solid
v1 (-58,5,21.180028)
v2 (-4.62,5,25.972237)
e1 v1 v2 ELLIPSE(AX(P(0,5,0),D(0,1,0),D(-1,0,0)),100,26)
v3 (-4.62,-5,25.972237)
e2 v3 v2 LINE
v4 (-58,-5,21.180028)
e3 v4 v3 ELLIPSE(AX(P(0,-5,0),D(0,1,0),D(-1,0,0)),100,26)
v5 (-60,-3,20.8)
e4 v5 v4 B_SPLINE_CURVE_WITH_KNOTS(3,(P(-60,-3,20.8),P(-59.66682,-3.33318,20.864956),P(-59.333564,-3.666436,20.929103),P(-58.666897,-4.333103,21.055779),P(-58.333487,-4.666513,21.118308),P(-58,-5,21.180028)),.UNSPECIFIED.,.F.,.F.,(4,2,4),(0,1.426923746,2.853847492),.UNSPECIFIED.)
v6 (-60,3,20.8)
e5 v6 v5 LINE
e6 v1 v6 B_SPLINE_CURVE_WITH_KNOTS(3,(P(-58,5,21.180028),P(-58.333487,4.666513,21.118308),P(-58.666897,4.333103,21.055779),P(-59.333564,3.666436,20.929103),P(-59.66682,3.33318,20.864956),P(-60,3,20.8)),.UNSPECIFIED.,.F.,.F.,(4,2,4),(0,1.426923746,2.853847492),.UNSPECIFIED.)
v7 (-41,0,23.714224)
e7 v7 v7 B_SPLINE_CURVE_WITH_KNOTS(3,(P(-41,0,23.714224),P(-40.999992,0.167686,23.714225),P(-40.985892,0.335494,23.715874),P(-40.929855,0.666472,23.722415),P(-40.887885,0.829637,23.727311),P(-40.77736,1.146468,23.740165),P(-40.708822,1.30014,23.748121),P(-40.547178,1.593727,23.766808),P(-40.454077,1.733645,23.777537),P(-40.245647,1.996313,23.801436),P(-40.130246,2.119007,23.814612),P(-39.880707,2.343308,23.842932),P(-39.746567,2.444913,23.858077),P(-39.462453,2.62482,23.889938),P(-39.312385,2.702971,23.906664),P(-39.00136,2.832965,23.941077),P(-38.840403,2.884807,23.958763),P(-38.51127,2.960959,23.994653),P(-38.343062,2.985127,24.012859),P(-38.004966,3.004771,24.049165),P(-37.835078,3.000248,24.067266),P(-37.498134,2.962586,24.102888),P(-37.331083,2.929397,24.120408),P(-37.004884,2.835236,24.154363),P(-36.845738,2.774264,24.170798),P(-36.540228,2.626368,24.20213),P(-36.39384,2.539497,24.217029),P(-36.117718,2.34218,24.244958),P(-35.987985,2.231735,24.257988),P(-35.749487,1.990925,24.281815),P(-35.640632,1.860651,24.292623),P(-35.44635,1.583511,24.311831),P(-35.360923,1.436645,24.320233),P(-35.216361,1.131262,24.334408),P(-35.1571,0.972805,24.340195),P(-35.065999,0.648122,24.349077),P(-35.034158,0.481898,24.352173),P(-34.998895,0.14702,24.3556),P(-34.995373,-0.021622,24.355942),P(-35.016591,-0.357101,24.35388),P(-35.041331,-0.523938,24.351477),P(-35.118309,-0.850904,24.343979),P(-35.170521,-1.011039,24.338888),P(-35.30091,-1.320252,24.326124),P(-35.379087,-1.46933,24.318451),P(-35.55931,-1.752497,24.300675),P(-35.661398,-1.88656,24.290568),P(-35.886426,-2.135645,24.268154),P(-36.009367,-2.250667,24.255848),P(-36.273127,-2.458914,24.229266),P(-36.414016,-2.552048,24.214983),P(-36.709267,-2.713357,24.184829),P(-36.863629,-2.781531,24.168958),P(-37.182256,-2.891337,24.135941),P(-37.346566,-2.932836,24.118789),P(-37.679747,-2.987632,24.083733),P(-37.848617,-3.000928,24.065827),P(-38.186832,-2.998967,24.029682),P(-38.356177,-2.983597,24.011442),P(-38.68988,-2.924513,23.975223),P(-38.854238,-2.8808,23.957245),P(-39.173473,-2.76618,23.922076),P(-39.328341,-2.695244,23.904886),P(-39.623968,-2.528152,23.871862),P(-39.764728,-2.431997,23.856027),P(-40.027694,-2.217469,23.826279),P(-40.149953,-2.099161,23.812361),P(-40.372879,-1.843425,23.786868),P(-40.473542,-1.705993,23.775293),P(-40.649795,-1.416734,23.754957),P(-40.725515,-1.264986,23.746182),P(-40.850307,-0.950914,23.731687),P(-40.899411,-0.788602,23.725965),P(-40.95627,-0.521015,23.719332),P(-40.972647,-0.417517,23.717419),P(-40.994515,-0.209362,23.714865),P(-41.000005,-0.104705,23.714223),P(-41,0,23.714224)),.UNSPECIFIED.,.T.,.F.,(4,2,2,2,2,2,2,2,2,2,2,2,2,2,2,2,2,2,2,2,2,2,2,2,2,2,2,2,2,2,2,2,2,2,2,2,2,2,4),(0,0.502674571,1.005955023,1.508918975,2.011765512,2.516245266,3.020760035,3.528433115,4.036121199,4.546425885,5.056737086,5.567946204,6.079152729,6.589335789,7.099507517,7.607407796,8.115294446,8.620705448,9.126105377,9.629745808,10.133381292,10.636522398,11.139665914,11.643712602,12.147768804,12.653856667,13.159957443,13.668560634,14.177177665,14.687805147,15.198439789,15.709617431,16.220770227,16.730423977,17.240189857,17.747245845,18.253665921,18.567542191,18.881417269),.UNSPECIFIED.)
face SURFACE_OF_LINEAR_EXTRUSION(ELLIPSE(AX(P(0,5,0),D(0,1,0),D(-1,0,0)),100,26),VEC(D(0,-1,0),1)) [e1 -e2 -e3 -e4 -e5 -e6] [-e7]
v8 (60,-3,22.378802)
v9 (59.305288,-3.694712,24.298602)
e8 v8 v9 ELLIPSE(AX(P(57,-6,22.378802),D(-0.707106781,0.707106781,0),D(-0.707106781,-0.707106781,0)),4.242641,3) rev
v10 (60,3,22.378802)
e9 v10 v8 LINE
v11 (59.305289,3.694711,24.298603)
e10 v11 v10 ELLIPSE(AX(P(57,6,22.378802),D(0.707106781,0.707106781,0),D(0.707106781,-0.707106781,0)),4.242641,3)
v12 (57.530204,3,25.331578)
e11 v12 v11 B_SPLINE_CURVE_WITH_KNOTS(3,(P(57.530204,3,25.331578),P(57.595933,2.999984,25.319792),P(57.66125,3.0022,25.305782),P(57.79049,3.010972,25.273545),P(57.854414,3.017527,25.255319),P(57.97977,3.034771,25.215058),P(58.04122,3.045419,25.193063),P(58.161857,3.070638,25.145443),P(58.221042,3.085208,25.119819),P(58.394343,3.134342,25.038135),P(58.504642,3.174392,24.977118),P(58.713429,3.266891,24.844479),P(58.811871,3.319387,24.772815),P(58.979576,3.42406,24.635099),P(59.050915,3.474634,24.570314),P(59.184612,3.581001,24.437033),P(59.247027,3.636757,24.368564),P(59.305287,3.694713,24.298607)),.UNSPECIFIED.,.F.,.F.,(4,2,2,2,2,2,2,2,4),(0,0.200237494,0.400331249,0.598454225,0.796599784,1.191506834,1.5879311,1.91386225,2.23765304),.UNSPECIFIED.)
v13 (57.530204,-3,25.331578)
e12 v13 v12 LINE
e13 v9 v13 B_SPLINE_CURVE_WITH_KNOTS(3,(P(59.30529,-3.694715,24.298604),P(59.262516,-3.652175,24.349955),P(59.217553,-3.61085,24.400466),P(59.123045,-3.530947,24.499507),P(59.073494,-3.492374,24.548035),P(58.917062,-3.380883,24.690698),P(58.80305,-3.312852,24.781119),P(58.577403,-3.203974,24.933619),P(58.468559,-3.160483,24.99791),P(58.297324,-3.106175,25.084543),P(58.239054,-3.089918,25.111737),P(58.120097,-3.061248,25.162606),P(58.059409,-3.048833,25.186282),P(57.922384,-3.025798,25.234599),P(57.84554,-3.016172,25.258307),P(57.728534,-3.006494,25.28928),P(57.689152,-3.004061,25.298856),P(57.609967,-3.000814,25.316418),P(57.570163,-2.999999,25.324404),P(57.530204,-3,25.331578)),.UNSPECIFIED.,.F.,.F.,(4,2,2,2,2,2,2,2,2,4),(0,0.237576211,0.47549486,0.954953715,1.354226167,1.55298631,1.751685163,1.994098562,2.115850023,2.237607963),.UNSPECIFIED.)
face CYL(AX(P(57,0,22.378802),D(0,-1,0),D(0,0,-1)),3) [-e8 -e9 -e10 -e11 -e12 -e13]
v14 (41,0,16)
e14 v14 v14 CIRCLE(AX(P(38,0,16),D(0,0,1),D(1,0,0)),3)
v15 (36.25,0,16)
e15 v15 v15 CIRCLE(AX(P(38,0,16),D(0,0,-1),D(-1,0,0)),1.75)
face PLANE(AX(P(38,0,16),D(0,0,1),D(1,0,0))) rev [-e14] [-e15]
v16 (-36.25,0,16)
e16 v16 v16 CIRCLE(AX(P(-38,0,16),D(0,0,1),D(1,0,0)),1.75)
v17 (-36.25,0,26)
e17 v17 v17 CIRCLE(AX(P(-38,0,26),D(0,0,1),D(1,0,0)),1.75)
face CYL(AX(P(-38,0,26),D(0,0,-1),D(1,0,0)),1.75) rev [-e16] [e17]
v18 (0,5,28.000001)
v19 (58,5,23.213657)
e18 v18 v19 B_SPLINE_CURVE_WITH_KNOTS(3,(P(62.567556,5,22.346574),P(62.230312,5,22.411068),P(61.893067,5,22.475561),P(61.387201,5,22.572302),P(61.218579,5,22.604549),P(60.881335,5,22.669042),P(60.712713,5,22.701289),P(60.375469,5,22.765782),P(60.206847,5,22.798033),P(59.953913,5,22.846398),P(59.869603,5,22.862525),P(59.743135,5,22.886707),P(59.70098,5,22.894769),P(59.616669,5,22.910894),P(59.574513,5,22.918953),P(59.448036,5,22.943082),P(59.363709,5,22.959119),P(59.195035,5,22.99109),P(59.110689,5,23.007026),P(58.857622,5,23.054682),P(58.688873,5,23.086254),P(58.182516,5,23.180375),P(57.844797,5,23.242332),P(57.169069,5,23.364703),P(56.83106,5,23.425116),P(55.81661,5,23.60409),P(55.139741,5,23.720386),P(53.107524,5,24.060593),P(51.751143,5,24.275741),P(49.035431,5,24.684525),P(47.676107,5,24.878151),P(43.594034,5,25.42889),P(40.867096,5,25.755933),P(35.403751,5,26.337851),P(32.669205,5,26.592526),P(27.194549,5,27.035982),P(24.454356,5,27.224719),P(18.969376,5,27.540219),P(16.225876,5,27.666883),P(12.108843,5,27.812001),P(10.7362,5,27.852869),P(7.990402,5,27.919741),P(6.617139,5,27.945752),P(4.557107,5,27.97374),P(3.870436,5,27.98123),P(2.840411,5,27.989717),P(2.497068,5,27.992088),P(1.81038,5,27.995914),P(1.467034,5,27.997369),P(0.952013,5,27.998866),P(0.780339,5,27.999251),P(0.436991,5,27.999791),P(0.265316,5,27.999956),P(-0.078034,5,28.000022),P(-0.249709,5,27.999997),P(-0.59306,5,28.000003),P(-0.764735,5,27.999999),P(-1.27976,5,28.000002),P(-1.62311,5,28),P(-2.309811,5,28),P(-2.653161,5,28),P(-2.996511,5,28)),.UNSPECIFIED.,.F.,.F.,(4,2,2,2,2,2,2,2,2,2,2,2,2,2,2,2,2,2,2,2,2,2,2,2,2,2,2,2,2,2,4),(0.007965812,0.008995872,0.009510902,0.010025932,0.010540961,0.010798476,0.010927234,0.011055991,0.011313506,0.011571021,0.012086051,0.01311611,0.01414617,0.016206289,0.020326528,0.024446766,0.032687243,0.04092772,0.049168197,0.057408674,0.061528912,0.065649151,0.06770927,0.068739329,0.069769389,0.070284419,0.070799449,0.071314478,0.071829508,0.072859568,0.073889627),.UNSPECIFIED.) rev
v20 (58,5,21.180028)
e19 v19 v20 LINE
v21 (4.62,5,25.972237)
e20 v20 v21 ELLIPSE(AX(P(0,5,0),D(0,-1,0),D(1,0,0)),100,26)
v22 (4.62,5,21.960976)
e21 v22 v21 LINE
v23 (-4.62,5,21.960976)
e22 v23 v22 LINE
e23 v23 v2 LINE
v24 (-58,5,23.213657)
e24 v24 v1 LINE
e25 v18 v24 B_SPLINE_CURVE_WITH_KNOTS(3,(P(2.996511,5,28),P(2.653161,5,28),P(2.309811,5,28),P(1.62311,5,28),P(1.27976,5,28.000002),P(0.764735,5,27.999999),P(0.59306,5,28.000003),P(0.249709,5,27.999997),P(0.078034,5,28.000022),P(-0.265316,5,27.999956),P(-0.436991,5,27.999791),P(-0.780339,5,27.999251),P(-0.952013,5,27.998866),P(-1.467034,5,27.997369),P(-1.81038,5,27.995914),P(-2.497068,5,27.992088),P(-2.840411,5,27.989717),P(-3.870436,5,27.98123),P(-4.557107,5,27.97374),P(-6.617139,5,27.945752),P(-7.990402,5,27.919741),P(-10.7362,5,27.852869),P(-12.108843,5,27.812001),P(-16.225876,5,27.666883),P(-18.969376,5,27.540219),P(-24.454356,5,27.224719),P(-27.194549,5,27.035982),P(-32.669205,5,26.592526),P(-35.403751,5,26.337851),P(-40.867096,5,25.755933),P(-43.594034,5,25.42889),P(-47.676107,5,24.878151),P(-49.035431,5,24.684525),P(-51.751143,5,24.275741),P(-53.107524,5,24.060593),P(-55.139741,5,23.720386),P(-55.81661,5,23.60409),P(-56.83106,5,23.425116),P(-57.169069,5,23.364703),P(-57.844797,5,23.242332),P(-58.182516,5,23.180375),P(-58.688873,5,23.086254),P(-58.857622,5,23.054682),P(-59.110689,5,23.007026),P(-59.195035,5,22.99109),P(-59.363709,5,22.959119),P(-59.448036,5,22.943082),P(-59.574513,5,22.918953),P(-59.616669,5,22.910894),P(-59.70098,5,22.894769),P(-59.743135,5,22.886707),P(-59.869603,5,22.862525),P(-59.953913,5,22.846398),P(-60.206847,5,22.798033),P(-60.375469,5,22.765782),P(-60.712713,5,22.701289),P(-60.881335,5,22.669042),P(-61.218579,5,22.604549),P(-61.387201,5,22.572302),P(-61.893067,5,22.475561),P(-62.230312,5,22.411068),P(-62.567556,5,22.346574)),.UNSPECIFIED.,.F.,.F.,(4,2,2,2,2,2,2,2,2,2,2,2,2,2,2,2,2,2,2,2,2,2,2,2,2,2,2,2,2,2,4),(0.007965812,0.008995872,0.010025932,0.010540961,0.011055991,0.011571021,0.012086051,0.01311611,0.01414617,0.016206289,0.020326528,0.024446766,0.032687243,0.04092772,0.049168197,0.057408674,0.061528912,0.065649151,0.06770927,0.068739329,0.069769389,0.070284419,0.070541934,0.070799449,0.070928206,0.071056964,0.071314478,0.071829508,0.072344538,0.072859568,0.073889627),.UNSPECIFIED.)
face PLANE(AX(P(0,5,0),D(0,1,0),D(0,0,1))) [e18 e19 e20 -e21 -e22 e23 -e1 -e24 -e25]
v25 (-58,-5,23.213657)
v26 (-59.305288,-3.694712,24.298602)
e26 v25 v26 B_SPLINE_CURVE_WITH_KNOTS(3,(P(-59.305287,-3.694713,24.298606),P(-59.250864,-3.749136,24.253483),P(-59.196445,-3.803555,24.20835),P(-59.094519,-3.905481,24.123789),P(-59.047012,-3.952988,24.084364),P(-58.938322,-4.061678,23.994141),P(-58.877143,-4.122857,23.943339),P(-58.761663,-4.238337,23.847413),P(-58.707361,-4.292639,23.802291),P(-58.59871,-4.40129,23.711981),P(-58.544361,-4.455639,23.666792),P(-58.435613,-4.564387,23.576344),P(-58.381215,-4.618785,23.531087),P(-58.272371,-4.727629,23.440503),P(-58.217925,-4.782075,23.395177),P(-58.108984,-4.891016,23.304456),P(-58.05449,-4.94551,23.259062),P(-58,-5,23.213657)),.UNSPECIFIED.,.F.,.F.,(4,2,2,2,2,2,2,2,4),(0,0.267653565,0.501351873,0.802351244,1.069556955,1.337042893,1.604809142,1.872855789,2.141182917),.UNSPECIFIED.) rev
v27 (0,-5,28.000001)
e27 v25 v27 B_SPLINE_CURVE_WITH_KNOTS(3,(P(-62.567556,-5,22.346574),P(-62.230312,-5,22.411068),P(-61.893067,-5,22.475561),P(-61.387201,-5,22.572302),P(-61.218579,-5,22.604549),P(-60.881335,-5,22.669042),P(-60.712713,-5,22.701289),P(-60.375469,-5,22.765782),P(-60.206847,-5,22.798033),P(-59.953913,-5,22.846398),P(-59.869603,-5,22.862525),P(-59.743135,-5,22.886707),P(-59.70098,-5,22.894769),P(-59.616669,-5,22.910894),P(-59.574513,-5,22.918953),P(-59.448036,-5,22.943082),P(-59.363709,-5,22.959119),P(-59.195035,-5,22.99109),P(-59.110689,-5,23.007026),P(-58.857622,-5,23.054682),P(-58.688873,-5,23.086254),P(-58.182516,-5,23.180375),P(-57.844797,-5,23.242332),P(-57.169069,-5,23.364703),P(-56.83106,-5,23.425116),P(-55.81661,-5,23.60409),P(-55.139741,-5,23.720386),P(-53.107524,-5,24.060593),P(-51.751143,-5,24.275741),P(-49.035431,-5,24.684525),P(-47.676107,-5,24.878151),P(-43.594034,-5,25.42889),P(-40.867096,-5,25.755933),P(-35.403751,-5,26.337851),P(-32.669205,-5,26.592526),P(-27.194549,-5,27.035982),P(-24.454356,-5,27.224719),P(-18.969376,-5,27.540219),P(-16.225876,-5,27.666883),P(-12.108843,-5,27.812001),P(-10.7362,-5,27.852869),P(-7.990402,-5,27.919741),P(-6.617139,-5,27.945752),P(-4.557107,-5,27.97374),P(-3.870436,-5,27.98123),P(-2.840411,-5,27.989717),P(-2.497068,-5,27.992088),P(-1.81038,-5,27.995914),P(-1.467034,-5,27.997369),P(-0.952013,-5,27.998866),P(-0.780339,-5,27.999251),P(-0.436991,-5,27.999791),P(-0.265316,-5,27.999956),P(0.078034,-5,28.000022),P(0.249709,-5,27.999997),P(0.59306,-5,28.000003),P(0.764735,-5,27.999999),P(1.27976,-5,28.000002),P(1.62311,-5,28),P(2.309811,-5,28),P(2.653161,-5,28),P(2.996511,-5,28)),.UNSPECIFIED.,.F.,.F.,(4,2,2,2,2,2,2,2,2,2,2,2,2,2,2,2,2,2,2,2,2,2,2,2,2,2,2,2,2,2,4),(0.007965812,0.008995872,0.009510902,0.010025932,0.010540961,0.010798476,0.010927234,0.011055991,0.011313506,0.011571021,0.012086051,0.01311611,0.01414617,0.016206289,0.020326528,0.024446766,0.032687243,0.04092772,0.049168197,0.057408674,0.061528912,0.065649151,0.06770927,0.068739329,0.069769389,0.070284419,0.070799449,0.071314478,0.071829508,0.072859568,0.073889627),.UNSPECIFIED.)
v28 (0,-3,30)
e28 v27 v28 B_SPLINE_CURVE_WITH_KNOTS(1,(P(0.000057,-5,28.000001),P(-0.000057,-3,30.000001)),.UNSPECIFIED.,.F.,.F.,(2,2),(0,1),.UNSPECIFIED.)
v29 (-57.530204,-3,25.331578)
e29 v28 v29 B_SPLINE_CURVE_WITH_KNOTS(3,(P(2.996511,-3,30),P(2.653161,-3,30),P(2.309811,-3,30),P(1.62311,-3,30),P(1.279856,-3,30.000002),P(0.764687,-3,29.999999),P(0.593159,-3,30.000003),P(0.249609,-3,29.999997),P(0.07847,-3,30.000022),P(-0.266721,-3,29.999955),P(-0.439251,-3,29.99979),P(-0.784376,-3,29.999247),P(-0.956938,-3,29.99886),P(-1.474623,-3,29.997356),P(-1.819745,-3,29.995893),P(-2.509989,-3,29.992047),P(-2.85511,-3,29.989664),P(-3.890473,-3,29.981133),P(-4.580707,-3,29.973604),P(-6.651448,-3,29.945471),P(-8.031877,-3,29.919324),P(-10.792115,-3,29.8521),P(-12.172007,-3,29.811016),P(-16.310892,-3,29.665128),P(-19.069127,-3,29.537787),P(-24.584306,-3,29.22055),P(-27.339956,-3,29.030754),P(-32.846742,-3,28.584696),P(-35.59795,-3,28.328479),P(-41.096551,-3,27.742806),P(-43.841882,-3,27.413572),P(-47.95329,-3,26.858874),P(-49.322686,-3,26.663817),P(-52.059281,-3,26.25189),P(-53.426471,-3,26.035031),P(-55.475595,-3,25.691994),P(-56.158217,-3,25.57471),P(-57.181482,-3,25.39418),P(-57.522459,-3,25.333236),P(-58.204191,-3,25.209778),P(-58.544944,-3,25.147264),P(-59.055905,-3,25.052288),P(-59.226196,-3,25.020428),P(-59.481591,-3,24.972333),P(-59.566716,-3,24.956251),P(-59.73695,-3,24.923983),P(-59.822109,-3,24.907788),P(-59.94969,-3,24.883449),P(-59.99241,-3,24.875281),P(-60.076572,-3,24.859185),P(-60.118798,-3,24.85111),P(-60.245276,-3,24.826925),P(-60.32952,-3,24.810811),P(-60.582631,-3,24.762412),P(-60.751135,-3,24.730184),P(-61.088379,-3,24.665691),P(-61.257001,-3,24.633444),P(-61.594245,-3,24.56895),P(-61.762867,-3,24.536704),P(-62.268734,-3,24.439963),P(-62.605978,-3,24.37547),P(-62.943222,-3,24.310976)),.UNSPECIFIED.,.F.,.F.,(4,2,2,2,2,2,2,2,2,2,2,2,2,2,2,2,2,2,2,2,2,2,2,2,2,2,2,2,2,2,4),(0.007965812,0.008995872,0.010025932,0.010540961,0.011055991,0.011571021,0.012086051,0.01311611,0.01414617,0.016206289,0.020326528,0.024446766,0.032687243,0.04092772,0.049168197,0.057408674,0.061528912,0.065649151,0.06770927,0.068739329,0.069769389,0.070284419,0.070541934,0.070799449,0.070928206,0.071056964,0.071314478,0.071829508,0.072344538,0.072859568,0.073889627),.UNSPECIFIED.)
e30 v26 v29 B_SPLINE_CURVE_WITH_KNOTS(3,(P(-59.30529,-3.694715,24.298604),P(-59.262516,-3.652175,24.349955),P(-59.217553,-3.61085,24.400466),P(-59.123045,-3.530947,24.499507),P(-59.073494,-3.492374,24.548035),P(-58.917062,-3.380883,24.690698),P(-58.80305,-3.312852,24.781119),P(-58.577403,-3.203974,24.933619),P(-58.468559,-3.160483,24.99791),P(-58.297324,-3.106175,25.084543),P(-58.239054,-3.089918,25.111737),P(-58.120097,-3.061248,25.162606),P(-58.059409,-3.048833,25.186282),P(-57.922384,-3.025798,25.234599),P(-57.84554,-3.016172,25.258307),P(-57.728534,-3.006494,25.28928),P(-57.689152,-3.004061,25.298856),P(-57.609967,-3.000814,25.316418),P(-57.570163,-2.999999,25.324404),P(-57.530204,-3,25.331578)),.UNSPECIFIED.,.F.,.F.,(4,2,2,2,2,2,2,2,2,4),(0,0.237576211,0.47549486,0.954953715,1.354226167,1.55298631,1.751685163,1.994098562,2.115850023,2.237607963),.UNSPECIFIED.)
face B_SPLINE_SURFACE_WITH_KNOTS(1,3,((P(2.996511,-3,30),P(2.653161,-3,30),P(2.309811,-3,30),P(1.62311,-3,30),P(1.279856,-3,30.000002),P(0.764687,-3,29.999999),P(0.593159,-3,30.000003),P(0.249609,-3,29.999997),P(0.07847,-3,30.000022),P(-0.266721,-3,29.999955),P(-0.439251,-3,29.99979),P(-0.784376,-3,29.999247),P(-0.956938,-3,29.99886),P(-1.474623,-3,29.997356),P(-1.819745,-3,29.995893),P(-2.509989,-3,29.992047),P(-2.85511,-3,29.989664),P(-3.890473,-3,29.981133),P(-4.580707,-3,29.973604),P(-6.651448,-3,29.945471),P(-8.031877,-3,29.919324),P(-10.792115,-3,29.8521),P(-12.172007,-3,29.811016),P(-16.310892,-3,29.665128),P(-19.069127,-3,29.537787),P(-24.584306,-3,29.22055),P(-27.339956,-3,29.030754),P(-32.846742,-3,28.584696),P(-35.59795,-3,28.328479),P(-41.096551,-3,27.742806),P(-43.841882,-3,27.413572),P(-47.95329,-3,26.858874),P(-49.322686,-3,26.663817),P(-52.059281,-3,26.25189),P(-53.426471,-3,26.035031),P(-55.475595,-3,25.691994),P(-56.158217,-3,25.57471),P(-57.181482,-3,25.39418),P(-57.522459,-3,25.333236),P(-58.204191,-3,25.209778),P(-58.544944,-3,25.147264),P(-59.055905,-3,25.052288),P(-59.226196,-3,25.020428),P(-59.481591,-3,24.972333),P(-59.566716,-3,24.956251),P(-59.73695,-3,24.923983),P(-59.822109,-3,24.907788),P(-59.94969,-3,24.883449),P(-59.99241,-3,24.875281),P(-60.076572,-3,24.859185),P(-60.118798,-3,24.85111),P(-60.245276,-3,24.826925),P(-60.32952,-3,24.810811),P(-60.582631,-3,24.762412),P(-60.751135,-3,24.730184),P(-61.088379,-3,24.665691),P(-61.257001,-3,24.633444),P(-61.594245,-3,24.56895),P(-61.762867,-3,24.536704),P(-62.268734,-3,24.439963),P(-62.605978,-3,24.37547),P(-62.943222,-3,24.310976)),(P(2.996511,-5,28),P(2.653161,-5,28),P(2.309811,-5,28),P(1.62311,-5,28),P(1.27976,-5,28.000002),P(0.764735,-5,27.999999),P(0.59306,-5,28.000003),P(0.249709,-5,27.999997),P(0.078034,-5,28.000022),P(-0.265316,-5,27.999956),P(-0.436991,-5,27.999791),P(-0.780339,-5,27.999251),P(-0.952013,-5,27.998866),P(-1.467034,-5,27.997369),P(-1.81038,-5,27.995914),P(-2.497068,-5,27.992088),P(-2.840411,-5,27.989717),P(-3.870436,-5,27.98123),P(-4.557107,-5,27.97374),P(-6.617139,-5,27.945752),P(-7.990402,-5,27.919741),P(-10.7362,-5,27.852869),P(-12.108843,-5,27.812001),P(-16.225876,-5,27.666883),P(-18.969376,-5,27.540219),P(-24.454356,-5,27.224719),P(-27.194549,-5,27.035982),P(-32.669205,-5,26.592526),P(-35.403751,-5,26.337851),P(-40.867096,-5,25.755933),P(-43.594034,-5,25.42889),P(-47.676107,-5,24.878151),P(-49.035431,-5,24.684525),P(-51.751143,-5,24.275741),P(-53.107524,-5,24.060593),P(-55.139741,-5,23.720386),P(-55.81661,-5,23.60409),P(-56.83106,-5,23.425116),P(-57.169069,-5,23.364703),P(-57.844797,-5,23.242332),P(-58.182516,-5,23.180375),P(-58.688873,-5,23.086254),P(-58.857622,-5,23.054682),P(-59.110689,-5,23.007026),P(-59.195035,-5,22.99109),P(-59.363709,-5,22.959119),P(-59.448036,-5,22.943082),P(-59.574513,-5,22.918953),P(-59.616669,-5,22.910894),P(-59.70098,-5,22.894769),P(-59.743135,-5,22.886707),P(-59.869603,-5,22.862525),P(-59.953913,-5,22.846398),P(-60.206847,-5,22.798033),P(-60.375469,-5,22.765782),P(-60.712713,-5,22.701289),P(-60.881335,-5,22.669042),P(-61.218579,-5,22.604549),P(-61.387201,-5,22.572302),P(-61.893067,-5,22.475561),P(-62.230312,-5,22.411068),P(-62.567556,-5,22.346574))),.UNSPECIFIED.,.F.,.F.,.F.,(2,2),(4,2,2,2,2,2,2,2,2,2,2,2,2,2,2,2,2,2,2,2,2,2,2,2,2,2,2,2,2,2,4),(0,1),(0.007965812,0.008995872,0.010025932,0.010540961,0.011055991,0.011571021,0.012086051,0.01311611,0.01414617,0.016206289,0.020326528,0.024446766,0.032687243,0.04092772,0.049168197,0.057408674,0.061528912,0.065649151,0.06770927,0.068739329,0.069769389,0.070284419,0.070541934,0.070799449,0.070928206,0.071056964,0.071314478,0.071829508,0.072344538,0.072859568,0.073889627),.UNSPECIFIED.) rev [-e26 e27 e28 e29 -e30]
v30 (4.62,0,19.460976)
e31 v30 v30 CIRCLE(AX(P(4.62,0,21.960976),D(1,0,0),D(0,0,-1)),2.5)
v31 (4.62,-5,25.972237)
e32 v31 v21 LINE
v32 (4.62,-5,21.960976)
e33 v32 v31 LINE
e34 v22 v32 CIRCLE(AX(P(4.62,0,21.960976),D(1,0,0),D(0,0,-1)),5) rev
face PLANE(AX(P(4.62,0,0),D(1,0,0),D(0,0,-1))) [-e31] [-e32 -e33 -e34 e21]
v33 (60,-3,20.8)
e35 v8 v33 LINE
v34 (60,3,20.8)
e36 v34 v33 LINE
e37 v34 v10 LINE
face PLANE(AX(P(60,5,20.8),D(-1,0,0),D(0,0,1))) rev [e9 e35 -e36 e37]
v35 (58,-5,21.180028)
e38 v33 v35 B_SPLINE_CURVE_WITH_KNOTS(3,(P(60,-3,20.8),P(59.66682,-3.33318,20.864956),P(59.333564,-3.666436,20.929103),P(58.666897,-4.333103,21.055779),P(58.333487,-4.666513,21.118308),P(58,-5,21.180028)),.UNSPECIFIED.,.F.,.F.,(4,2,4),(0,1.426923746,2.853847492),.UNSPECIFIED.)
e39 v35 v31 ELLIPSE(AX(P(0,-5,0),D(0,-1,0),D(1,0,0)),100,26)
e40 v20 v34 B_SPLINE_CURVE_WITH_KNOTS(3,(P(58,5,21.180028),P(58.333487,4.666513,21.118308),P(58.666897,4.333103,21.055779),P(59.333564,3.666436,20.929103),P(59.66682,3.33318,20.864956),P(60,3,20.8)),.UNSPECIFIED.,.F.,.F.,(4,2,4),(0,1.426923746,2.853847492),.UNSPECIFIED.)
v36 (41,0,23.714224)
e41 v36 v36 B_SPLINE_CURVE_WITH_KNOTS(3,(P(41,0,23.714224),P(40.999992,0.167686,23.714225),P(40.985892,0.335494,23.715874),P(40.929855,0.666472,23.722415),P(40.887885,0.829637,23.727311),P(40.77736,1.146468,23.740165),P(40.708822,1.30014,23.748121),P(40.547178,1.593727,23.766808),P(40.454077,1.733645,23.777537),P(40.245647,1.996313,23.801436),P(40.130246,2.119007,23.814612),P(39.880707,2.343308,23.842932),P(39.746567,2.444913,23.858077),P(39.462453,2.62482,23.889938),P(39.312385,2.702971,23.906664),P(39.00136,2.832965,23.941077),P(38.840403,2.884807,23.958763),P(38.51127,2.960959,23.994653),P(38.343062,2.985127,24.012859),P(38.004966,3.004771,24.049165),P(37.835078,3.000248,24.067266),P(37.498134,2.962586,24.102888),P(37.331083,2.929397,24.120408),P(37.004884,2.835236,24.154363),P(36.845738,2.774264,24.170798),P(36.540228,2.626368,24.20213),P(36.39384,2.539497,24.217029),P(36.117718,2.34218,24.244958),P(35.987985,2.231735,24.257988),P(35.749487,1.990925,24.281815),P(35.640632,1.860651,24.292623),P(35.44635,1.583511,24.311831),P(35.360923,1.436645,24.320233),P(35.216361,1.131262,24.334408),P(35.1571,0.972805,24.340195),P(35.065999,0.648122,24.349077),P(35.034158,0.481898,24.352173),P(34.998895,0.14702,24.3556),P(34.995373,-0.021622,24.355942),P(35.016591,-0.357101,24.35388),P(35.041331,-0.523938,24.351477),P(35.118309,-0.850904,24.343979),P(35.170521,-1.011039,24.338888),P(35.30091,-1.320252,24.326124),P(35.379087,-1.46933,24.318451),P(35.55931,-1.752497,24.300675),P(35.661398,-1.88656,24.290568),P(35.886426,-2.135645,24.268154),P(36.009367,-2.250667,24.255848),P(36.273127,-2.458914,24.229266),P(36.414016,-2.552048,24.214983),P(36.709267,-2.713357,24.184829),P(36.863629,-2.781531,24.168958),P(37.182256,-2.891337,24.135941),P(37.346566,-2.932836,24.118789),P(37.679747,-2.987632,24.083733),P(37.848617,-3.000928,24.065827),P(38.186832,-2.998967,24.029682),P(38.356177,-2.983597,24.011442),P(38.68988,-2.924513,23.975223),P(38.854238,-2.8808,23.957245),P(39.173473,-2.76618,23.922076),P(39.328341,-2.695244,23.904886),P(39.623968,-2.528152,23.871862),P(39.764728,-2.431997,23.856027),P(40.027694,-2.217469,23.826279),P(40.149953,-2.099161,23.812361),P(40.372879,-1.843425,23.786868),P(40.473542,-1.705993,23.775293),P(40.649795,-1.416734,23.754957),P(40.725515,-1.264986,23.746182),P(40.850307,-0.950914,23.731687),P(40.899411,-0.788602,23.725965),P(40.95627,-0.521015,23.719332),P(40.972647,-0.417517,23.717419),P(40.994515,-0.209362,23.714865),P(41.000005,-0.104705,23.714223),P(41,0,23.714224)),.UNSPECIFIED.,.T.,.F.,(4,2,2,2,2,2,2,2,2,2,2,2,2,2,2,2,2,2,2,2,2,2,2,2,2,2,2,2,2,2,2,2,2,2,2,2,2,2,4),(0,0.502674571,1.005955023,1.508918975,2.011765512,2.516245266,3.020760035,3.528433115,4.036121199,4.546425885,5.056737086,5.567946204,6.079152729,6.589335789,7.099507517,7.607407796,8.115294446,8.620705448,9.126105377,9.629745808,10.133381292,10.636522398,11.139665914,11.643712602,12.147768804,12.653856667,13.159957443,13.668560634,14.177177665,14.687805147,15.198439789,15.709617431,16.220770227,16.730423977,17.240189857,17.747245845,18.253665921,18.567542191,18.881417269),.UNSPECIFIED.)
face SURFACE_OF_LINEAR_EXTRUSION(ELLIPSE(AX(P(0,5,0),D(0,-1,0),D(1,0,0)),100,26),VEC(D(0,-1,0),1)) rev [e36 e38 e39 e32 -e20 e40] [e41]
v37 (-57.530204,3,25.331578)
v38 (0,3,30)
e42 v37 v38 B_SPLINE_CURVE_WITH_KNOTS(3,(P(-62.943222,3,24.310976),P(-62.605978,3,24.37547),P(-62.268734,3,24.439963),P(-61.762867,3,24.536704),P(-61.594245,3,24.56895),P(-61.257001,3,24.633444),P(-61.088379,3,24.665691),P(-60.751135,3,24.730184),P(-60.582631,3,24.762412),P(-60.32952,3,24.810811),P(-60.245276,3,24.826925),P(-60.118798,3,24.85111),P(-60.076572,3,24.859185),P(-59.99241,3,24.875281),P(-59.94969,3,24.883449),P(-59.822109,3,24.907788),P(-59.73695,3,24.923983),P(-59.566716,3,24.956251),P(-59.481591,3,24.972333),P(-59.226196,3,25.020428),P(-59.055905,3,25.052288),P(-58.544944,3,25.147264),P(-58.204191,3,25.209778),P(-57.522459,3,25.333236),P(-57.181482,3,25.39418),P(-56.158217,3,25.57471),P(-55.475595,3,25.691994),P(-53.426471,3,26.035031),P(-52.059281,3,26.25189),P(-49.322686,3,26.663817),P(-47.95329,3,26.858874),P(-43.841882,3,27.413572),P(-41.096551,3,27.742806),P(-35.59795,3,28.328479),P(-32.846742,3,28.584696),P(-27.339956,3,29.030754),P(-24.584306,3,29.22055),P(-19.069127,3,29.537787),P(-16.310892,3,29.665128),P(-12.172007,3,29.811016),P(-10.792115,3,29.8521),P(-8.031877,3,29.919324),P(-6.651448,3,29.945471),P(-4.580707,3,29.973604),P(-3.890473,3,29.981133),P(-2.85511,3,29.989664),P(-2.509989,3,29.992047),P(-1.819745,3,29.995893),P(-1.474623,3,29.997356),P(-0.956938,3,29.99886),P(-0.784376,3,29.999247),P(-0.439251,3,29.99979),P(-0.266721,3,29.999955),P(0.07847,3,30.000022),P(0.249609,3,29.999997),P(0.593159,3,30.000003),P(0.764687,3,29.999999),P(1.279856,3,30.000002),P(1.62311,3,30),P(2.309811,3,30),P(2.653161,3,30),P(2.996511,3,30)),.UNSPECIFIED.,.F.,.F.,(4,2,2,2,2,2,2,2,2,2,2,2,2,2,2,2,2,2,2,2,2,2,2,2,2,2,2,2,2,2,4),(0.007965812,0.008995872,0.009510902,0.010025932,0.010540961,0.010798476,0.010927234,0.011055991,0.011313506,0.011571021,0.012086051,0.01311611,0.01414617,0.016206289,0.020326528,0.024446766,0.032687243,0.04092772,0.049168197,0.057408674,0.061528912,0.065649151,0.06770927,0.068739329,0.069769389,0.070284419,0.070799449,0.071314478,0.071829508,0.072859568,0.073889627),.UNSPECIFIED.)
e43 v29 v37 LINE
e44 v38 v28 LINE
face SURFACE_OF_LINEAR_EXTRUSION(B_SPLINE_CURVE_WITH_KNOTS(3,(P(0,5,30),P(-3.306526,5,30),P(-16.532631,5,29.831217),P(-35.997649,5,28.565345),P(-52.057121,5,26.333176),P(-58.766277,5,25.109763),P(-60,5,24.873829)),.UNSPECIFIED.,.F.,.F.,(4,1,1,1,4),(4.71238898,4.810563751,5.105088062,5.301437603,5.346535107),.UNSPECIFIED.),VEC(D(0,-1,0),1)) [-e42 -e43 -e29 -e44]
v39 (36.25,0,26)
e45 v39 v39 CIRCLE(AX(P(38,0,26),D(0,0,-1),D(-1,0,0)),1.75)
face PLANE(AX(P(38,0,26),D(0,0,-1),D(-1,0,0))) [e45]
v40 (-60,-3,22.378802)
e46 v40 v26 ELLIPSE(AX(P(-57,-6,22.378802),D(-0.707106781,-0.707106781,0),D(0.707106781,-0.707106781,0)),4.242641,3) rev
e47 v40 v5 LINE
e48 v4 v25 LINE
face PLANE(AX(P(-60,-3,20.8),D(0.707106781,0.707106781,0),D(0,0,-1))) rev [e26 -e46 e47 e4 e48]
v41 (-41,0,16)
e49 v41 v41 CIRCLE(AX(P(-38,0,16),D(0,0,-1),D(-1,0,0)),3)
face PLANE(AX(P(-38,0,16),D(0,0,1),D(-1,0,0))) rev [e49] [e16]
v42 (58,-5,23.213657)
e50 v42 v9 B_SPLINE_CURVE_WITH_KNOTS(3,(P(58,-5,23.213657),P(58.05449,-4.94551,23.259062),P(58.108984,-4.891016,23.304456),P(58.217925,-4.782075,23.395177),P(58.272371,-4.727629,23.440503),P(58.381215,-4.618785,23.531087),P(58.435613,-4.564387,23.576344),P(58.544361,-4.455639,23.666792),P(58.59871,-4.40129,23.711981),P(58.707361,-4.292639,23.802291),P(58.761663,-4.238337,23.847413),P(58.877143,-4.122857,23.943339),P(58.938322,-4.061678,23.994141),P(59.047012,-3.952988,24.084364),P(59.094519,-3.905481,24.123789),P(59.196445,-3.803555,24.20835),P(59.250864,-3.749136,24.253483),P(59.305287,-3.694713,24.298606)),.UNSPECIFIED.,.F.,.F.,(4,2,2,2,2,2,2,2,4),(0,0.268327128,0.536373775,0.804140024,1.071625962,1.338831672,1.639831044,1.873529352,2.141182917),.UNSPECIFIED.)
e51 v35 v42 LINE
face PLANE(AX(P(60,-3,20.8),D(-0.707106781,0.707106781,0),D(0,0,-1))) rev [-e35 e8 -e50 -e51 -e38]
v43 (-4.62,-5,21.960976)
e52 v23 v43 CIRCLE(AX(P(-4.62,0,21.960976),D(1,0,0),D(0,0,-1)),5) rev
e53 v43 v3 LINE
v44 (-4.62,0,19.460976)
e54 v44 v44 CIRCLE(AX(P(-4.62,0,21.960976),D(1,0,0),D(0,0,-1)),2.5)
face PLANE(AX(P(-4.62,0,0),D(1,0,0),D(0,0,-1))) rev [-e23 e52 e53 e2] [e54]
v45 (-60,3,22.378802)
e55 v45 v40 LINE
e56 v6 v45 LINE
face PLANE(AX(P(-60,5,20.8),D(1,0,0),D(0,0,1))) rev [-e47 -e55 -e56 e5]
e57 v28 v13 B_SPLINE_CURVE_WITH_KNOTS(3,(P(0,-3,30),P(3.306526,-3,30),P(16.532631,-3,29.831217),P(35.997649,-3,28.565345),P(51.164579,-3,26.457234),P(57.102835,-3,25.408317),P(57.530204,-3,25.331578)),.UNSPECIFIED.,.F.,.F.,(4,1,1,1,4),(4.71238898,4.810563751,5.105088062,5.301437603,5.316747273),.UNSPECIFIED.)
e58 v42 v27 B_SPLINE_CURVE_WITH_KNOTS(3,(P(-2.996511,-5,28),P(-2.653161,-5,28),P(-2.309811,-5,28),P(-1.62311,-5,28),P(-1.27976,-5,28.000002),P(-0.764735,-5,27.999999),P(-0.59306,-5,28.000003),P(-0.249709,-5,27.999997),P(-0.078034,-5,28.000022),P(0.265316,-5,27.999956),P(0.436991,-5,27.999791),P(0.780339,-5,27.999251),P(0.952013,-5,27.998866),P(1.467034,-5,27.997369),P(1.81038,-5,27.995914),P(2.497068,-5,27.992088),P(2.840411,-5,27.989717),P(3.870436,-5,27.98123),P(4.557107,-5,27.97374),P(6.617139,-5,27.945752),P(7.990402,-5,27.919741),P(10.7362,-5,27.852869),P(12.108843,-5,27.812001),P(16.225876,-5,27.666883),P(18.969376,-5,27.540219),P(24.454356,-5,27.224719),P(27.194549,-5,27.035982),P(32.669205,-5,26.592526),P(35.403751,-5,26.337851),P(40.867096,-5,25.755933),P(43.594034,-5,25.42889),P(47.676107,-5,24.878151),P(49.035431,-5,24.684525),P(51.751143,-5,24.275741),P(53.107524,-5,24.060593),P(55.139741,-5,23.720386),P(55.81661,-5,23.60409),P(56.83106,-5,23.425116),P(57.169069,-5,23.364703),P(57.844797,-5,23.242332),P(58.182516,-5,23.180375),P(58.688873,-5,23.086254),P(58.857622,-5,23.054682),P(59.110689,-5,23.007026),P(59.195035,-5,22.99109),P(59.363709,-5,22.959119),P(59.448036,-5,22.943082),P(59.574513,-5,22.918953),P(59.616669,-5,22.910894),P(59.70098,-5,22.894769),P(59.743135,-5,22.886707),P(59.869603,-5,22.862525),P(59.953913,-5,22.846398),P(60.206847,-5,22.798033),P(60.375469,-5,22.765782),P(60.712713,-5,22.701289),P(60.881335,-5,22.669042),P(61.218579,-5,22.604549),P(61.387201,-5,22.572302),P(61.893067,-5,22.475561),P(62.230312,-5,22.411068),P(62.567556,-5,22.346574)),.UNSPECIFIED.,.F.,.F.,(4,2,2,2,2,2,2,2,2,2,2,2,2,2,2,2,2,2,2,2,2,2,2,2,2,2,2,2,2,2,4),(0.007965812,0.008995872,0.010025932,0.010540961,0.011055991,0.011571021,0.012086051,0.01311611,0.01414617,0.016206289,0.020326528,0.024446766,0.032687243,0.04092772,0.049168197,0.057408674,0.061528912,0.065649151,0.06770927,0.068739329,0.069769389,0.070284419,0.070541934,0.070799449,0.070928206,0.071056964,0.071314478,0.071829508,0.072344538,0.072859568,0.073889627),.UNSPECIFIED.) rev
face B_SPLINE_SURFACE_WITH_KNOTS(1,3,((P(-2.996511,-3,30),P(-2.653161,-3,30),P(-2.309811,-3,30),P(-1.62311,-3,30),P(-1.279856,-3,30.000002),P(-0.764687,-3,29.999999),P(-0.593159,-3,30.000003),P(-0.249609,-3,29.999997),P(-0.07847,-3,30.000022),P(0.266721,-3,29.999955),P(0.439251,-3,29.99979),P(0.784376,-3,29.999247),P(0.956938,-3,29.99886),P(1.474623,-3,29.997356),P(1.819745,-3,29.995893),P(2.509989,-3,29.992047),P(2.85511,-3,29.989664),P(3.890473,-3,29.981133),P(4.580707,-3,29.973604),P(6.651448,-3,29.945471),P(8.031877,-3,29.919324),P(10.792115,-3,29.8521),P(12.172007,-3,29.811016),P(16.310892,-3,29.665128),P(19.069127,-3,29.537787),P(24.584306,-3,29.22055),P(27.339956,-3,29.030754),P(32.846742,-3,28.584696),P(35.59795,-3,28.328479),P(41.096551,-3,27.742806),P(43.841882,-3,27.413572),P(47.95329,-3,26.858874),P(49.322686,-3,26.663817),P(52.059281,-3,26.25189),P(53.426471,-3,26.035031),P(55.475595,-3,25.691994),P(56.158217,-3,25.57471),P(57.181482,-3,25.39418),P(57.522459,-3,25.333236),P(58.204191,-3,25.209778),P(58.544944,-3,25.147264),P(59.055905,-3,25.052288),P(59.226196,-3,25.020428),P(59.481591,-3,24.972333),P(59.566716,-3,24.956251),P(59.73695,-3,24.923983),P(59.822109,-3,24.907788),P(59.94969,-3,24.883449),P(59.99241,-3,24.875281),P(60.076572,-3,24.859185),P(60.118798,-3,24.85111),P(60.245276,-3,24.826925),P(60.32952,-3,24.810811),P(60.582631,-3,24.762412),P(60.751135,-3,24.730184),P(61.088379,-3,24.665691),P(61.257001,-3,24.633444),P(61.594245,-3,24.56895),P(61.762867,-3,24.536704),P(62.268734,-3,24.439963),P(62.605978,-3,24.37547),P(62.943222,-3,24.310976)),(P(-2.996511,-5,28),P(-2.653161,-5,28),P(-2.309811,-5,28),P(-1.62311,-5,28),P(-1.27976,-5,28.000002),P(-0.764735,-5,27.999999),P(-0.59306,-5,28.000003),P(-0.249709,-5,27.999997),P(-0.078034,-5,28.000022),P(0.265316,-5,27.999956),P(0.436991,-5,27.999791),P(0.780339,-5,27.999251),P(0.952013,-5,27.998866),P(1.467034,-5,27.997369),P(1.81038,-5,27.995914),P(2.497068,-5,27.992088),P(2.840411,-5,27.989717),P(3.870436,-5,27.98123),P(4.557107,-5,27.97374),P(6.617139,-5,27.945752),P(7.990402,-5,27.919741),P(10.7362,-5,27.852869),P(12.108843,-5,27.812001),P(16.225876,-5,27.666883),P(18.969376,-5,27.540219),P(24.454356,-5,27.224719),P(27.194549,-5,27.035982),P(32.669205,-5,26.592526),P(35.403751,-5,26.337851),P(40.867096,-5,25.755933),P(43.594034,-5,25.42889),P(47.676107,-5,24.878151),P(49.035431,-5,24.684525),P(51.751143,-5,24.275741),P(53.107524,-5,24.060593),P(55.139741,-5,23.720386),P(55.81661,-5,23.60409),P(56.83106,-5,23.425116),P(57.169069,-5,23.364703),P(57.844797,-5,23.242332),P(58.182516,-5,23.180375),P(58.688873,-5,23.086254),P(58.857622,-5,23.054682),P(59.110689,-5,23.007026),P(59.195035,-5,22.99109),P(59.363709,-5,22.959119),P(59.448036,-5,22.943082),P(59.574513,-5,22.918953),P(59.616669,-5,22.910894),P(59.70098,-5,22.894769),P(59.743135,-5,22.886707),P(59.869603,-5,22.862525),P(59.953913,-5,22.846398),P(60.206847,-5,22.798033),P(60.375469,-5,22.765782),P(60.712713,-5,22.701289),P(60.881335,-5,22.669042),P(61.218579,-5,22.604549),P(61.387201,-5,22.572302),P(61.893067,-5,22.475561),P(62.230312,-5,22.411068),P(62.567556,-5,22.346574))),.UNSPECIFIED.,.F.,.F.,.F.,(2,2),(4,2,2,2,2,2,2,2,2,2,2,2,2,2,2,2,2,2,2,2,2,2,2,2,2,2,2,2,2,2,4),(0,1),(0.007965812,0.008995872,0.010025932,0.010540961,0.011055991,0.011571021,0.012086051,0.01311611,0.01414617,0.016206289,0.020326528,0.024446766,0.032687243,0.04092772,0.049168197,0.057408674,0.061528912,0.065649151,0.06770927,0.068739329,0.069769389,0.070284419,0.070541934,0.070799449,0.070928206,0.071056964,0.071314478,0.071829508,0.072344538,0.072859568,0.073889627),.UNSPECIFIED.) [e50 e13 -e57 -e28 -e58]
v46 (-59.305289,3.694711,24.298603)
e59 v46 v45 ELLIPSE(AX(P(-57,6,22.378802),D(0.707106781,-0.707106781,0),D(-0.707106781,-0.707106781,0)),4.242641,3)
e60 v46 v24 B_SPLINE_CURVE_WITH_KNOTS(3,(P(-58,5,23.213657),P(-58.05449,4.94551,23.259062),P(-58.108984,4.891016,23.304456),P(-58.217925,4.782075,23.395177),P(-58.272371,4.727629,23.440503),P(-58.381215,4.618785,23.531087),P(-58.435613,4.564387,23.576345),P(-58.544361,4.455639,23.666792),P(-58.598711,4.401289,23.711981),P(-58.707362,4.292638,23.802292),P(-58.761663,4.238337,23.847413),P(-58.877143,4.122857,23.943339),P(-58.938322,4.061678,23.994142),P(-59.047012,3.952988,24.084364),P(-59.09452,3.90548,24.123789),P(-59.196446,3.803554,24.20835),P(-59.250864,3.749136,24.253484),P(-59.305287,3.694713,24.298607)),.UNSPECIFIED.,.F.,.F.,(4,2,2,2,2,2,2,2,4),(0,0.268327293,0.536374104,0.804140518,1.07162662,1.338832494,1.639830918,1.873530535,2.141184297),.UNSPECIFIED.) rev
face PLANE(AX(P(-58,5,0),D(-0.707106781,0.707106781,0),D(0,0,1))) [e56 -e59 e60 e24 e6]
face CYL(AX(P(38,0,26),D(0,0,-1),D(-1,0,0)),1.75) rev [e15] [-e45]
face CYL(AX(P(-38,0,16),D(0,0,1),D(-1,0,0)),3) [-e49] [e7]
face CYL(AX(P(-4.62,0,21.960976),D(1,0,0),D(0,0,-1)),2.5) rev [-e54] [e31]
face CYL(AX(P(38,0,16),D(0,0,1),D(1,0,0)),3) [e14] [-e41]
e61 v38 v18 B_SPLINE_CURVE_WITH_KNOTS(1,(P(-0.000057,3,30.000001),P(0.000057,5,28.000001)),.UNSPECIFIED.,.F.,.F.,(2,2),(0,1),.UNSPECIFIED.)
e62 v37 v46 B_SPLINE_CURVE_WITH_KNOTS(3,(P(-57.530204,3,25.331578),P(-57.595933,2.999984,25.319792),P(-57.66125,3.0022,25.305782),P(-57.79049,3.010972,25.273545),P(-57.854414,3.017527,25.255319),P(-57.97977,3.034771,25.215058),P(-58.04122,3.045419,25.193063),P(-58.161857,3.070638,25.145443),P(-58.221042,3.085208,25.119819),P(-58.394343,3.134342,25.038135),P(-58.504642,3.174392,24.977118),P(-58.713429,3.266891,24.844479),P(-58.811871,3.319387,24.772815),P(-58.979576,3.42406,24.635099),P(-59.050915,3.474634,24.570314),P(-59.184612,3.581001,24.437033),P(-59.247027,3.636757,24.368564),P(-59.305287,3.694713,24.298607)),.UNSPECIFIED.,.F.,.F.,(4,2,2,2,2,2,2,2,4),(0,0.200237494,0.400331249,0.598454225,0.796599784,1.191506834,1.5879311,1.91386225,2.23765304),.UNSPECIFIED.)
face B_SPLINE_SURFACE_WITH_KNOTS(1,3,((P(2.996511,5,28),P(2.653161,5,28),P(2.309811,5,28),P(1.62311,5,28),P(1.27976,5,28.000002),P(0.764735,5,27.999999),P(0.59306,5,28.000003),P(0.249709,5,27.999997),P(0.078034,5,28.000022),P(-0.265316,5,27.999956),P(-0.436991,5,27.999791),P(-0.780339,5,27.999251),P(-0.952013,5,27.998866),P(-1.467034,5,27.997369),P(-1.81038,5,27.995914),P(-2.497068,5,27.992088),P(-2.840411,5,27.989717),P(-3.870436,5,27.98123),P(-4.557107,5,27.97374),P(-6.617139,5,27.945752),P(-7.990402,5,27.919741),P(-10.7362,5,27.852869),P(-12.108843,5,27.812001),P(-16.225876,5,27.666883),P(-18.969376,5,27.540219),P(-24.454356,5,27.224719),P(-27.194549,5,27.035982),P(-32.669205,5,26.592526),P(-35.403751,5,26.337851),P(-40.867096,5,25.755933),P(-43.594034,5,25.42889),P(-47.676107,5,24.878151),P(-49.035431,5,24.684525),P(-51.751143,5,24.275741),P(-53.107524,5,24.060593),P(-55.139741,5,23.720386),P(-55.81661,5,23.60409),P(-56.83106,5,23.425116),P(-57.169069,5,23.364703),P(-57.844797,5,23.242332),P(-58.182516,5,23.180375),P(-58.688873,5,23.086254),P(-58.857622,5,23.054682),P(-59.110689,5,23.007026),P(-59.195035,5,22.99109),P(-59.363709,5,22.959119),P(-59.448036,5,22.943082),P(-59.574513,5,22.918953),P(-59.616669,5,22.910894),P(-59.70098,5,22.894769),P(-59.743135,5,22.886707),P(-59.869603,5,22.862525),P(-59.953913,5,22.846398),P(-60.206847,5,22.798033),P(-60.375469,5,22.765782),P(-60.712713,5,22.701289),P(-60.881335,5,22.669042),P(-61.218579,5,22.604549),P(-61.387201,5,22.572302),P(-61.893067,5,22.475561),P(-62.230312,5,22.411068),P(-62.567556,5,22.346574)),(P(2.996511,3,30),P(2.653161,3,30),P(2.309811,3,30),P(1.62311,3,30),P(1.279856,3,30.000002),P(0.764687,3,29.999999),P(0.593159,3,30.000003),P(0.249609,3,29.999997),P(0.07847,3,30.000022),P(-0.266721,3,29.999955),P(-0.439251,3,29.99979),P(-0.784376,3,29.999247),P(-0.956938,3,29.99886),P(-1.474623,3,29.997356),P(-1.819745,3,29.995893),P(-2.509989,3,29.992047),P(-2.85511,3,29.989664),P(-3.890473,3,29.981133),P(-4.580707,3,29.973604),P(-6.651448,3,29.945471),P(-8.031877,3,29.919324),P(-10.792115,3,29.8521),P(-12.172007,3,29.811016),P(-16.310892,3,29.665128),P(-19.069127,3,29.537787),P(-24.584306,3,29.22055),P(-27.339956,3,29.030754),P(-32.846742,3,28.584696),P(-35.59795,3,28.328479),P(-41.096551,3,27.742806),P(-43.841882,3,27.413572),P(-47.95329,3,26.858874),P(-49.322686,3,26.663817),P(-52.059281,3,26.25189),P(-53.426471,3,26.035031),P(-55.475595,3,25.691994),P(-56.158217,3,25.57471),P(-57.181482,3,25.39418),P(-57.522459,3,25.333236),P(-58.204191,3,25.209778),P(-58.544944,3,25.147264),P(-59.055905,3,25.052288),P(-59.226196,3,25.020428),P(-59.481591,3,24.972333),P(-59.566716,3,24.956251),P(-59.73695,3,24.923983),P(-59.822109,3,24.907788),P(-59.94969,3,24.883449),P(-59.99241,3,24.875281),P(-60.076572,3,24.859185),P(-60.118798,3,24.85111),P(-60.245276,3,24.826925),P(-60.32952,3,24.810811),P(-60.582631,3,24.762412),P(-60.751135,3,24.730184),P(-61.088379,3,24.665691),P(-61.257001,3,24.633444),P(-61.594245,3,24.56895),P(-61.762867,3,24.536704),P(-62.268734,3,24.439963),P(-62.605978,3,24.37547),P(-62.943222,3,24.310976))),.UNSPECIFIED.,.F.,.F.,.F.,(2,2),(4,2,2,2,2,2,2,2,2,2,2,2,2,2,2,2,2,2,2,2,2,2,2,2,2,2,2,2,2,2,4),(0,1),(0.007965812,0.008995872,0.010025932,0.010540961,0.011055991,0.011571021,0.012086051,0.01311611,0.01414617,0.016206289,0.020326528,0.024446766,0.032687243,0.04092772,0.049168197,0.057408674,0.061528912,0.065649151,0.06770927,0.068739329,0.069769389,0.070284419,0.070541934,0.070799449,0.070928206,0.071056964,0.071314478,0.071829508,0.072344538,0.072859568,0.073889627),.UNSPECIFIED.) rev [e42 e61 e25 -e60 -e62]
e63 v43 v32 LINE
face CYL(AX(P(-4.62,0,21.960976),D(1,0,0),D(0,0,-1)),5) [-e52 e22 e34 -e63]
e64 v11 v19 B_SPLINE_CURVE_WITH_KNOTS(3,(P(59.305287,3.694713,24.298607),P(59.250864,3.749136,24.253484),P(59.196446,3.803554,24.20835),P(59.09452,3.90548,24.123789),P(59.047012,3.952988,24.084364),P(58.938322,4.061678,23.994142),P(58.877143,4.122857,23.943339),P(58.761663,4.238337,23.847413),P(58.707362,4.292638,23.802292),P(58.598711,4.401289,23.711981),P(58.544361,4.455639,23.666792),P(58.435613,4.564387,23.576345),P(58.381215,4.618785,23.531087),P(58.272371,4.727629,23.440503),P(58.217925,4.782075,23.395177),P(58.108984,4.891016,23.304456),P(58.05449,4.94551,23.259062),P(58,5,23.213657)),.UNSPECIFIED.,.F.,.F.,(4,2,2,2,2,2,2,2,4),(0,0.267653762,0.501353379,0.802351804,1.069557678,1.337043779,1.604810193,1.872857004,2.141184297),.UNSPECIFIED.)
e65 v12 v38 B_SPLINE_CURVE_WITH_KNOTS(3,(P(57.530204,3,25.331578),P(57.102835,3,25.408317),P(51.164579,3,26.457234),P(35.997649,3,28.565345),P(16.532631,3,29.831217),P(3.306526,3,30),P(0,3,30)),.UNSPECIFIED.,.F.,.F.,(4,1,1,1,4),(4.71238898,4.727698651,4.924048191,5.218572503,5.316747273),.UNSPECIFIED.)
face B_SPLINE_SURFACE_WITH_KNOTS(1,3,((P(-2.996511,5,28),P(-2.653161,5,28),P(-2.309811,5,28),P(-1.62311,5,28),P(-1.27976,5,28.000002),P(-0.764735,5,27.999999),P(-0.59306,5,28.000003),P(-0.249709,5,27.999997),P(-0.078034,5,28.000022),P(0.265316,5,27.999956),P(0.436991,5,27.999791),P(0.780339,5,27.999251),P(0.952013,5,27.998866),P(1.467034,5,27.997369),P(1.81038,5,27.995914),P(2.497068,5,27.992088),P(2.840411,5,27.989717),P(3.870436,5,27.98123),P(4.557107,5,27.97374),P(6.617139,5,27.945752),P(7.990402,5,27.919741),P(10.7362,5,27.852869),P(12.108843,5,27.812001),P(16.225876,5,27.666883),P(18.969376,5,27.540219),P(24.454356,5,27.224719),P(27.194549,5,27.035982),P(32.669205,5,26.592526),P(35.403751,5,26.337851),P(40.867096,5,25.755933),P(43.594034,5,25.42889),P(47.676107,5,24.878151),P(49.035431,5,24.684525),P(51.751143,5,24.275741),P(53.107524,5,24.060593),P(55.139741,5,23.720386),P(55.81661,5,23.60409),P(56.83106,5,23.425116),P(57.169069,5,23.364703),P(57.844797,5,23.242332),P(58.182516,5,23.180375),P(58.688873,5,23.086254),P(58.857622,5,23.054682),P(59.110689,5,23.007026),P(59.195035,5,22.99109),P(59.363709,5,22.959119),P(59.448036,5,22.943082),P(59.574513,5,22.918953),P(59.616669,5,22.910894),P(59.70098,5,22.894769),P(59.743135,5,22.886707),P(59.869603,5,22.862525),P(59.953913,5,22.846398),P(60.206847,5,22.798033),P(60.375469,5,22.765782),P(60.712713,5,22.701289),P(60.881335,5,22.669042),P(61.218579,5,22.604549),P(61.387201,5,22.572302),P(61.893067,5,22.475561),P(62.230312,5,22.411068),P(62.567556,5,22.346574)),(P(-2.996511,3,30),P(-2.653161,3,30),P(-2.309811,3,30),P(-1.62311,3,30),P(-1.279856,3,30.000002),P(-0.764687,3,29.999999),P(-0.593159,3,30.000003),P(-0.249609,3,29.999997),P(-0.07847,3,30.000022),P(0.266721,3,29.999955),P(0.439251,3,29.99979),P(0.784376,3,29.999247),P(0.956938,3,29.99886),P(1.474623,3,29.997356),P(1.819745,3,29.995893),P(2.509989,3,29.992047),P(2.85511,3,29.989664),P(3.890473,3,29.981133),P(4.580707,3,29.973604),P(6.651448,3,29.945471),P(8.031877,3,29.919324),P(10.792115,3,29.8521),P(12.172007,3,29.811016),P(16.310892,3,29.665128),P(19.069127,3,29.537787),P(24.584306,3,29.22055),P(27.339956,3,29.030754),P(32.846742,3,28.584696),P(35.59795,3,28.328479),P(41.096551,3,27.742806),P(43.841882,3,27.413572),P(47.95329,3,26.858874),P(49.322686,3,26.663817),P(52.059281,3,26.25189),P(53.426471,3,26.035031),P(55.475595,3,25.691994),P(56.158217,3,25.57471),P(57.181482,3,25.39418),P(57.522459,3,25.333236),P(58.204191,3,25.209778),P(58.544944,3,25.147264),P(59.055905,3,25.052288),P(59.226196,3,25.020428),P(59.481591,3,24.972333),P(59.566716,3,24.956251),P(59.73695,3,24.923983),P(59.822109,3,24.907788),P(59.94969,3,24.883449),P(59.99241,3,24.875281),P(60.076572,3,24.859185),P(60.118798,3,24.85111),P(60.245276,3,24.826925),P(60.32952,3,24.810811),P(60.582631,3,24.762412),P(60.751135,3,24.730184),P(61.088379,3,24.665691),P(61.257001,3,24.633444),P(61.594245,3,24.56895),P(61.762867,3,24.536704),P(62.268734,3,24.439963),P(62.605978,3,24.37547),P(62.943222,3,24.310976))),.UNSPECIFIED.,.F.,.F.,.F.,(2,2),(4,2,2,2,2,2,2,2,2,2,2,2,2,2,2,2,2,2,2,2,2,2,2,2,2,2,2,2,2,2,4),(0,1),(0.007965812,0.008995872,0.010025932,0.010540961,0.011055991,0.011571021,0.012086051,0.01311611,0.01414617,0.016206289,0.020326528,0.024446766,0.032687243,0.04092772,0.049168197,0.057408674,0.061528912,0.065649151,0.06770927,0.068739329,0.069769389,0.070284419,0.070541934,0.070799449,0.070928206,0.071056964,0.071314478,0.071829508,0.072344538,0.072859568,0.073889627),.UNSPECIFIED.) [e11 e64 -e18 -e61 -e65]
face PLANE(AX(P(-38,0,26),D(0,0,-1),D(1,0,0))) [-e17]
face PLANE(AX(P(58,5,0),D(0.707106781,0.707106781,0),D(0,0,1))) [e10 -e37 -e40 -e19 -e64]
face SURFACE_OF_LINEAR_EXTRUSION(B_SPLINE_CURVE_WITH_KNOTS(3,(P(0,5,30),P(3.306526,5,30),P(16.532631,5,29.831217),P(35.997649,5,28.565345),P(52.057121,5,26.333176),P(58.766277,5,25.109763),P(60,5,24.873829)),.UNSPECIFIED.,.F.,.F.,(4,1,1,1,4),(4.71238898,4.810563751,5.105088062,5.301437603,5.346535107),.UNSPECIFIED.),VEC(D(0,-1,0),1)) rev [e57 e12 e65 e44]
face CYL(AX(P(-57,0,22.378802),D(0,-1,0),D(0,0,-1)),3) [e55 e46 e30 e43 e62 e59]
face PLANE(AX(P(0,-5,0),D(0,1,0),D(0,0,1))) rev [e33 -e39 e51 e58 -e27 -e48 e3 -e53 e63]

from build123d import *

# Parameters (mm, degrees)
SALIENTE_EXTRUIR2_DEPTH      = 5
CROQUIS6_R                   = 3
SALIENTE_EXTRUIR3_DEPTH      = 10
CROQUIS7_R                   = 1.75
CORTAR_EXTRUIR1_DEPTH        = 10
CHAFL_N1_SIZE                = 2
REDONDEO2_START              = -5.0000001
REDONDEO2_DEPTH              = 10.0000002
SALIENTE_EXTRUIR8_DEPTH      = 4.62
SALIENTE_EXTRUIR8_DEPTH_BACK = 4.62
CROQUIS17_R                  = 2.5


with BuildPart() as part:
    # Croquis5 → Saliente-Extruir2 (new, symmetric)
    with BuildSketch(Plane(origin=(0, 0, 0), x_dir=(1, 0, 0), z_dir=(0, 1, 0))):
        with BuildLine():
            Line((0, -26), (0, -30))
            add(Edge.make_bspline(
                [(0, -30), (3.306526268, -30), (16.53263134, -29.831217065), (35.997648536, -28.565345051), (52.057120801, -26.333176426), (58.766277483, -25.109762555), (60, -24.873829164)],
                knots=[4.71238898, 4.71238898, 4.71238898, 4.71238898, 4.810563751, 5.105088062, 5.301437603, 5.346535107, 5.346535107, 5.346535107, 5.346535107], degree=3))
            Line((60, -24.873829164), (60, -20.8))
            add(Edge.make_bspline(
                [(0, -26), (33.333333333, -26), (60, -20.8)],
                knots=[4.71238898, 4.71238898, 4.71238898, 5.355890089, 5.355890089, 5.355890089], degree=2, weights=[1, 0.948683298, 1]))
        make_face()
    extrude(amount=SALIENTE_EXTRUIR2_DEPTH, both=True)

    # Croquis6 → Saliente-Extruir3 (add)
    with BuildSketch(Plane.XY.offset(26)):
        with Locations((38, 0)):
            Circle(CROQUIS6_R)
    extrude(amount=-SALIENTE_EXTRUIR3_DEPTH)

    # Croquis7 → Cortar-Extruir1 (cut)
    with BuildSketch(Plane(origin=(0, 0, 16), x_dir=(-1, 0, 0), z_dir=(0, 0, -1))):
        with Locations((-38, 0)):
            Circle(CROQUIS7_R)
    extrude(amount=-CORTAR_EXTRUIR1_DEPTH, mode=Mode.SUBTRACT)

    # Chaflán1
    chafl_n1_edges = [part.edges().sort_by_distance(p)[0] for p in [
        (60, -5, 22.836914582),
        (60, 5, 22.836914582),
        (30.12007931, -5, 28.805559056),
        (30.12007931, 5, 28.805559056),
    ]]
    chamfer(chafl_n1_edges, length=CHAFL_N1_SIZE)

    # Redondeo2: read off the stored shape, not the designer's step
    # Redondeo2 outline → Redondeo2 (cut)
    with BuildSketch(Plane(origin=(0, 0, 0), x_dir=(1, 0, 0), z_dir=(0, 1, 0)).offset(REDONDEO2_START)):
        with BuildLine():
            Line((60, -24.873829164), (60, -22.378802425))
            ThreePointArc((60, -22.378802425), (59.301153244, -24.303560526), (57.530204169, -25.331577991))
            add(Edge.make_bspline(
                [(57.530204169, -25.331577991), (58.36173126, -25.182267919), (59.185100773, -25.029668046), (60, -24.873829164)],
                knots=[5.316747273, 5.316747273, 5.316747273, 5.316747273, 5.346535107, 5.346535107, 5.346535107, 5.346535107], degree=3))
        make_face()
    extrude(amount=REDONDEO2_DEPTH, mode=Mode.SUBTRACT)

    # Croquis17 → Saliente-Extruir8 (add, two sides: drawn at the far end of the back side and taken through both)
    with BuildSketch(Plane(origin=(0, 0, 0), x_dir=(0, 0, -1), z_dir=(1, 0, 0)).offset(-SALIENTE_EXTRUIR8_DEPTH_BACK)):
        with BuildLine():
            ThreePointArc((-21.96097599, 5), (-16.96097599, 0), (-21.96097599, -5))
            Line((-21.96097599, -5), (-26.96097599, -5))
            Line((-26.96097599, -5), (-26.96097599, 5))
            Line((-26.96097599, 5), (-21.96097599, 5))
        make_face()
        with Locations((-21.96097599, 0)):
            Circle(CROQUIS17_R, mode=Mode.SUBTRACT)
    extrude(amount=SALIENTE_EXTRUIR8_DEPTH + SALIENTE_EXTRUIR8_DEPTH_BACK)

    # Simetría2: part across plane


with BuildPart() as part_1:
    add(part.part)
    add(part.part.mirror(Plane(origin=(0, 0, 0), x_dir=(0, 0, 1), z_dir=(1, 0, 0))))


solid = part_1.part
